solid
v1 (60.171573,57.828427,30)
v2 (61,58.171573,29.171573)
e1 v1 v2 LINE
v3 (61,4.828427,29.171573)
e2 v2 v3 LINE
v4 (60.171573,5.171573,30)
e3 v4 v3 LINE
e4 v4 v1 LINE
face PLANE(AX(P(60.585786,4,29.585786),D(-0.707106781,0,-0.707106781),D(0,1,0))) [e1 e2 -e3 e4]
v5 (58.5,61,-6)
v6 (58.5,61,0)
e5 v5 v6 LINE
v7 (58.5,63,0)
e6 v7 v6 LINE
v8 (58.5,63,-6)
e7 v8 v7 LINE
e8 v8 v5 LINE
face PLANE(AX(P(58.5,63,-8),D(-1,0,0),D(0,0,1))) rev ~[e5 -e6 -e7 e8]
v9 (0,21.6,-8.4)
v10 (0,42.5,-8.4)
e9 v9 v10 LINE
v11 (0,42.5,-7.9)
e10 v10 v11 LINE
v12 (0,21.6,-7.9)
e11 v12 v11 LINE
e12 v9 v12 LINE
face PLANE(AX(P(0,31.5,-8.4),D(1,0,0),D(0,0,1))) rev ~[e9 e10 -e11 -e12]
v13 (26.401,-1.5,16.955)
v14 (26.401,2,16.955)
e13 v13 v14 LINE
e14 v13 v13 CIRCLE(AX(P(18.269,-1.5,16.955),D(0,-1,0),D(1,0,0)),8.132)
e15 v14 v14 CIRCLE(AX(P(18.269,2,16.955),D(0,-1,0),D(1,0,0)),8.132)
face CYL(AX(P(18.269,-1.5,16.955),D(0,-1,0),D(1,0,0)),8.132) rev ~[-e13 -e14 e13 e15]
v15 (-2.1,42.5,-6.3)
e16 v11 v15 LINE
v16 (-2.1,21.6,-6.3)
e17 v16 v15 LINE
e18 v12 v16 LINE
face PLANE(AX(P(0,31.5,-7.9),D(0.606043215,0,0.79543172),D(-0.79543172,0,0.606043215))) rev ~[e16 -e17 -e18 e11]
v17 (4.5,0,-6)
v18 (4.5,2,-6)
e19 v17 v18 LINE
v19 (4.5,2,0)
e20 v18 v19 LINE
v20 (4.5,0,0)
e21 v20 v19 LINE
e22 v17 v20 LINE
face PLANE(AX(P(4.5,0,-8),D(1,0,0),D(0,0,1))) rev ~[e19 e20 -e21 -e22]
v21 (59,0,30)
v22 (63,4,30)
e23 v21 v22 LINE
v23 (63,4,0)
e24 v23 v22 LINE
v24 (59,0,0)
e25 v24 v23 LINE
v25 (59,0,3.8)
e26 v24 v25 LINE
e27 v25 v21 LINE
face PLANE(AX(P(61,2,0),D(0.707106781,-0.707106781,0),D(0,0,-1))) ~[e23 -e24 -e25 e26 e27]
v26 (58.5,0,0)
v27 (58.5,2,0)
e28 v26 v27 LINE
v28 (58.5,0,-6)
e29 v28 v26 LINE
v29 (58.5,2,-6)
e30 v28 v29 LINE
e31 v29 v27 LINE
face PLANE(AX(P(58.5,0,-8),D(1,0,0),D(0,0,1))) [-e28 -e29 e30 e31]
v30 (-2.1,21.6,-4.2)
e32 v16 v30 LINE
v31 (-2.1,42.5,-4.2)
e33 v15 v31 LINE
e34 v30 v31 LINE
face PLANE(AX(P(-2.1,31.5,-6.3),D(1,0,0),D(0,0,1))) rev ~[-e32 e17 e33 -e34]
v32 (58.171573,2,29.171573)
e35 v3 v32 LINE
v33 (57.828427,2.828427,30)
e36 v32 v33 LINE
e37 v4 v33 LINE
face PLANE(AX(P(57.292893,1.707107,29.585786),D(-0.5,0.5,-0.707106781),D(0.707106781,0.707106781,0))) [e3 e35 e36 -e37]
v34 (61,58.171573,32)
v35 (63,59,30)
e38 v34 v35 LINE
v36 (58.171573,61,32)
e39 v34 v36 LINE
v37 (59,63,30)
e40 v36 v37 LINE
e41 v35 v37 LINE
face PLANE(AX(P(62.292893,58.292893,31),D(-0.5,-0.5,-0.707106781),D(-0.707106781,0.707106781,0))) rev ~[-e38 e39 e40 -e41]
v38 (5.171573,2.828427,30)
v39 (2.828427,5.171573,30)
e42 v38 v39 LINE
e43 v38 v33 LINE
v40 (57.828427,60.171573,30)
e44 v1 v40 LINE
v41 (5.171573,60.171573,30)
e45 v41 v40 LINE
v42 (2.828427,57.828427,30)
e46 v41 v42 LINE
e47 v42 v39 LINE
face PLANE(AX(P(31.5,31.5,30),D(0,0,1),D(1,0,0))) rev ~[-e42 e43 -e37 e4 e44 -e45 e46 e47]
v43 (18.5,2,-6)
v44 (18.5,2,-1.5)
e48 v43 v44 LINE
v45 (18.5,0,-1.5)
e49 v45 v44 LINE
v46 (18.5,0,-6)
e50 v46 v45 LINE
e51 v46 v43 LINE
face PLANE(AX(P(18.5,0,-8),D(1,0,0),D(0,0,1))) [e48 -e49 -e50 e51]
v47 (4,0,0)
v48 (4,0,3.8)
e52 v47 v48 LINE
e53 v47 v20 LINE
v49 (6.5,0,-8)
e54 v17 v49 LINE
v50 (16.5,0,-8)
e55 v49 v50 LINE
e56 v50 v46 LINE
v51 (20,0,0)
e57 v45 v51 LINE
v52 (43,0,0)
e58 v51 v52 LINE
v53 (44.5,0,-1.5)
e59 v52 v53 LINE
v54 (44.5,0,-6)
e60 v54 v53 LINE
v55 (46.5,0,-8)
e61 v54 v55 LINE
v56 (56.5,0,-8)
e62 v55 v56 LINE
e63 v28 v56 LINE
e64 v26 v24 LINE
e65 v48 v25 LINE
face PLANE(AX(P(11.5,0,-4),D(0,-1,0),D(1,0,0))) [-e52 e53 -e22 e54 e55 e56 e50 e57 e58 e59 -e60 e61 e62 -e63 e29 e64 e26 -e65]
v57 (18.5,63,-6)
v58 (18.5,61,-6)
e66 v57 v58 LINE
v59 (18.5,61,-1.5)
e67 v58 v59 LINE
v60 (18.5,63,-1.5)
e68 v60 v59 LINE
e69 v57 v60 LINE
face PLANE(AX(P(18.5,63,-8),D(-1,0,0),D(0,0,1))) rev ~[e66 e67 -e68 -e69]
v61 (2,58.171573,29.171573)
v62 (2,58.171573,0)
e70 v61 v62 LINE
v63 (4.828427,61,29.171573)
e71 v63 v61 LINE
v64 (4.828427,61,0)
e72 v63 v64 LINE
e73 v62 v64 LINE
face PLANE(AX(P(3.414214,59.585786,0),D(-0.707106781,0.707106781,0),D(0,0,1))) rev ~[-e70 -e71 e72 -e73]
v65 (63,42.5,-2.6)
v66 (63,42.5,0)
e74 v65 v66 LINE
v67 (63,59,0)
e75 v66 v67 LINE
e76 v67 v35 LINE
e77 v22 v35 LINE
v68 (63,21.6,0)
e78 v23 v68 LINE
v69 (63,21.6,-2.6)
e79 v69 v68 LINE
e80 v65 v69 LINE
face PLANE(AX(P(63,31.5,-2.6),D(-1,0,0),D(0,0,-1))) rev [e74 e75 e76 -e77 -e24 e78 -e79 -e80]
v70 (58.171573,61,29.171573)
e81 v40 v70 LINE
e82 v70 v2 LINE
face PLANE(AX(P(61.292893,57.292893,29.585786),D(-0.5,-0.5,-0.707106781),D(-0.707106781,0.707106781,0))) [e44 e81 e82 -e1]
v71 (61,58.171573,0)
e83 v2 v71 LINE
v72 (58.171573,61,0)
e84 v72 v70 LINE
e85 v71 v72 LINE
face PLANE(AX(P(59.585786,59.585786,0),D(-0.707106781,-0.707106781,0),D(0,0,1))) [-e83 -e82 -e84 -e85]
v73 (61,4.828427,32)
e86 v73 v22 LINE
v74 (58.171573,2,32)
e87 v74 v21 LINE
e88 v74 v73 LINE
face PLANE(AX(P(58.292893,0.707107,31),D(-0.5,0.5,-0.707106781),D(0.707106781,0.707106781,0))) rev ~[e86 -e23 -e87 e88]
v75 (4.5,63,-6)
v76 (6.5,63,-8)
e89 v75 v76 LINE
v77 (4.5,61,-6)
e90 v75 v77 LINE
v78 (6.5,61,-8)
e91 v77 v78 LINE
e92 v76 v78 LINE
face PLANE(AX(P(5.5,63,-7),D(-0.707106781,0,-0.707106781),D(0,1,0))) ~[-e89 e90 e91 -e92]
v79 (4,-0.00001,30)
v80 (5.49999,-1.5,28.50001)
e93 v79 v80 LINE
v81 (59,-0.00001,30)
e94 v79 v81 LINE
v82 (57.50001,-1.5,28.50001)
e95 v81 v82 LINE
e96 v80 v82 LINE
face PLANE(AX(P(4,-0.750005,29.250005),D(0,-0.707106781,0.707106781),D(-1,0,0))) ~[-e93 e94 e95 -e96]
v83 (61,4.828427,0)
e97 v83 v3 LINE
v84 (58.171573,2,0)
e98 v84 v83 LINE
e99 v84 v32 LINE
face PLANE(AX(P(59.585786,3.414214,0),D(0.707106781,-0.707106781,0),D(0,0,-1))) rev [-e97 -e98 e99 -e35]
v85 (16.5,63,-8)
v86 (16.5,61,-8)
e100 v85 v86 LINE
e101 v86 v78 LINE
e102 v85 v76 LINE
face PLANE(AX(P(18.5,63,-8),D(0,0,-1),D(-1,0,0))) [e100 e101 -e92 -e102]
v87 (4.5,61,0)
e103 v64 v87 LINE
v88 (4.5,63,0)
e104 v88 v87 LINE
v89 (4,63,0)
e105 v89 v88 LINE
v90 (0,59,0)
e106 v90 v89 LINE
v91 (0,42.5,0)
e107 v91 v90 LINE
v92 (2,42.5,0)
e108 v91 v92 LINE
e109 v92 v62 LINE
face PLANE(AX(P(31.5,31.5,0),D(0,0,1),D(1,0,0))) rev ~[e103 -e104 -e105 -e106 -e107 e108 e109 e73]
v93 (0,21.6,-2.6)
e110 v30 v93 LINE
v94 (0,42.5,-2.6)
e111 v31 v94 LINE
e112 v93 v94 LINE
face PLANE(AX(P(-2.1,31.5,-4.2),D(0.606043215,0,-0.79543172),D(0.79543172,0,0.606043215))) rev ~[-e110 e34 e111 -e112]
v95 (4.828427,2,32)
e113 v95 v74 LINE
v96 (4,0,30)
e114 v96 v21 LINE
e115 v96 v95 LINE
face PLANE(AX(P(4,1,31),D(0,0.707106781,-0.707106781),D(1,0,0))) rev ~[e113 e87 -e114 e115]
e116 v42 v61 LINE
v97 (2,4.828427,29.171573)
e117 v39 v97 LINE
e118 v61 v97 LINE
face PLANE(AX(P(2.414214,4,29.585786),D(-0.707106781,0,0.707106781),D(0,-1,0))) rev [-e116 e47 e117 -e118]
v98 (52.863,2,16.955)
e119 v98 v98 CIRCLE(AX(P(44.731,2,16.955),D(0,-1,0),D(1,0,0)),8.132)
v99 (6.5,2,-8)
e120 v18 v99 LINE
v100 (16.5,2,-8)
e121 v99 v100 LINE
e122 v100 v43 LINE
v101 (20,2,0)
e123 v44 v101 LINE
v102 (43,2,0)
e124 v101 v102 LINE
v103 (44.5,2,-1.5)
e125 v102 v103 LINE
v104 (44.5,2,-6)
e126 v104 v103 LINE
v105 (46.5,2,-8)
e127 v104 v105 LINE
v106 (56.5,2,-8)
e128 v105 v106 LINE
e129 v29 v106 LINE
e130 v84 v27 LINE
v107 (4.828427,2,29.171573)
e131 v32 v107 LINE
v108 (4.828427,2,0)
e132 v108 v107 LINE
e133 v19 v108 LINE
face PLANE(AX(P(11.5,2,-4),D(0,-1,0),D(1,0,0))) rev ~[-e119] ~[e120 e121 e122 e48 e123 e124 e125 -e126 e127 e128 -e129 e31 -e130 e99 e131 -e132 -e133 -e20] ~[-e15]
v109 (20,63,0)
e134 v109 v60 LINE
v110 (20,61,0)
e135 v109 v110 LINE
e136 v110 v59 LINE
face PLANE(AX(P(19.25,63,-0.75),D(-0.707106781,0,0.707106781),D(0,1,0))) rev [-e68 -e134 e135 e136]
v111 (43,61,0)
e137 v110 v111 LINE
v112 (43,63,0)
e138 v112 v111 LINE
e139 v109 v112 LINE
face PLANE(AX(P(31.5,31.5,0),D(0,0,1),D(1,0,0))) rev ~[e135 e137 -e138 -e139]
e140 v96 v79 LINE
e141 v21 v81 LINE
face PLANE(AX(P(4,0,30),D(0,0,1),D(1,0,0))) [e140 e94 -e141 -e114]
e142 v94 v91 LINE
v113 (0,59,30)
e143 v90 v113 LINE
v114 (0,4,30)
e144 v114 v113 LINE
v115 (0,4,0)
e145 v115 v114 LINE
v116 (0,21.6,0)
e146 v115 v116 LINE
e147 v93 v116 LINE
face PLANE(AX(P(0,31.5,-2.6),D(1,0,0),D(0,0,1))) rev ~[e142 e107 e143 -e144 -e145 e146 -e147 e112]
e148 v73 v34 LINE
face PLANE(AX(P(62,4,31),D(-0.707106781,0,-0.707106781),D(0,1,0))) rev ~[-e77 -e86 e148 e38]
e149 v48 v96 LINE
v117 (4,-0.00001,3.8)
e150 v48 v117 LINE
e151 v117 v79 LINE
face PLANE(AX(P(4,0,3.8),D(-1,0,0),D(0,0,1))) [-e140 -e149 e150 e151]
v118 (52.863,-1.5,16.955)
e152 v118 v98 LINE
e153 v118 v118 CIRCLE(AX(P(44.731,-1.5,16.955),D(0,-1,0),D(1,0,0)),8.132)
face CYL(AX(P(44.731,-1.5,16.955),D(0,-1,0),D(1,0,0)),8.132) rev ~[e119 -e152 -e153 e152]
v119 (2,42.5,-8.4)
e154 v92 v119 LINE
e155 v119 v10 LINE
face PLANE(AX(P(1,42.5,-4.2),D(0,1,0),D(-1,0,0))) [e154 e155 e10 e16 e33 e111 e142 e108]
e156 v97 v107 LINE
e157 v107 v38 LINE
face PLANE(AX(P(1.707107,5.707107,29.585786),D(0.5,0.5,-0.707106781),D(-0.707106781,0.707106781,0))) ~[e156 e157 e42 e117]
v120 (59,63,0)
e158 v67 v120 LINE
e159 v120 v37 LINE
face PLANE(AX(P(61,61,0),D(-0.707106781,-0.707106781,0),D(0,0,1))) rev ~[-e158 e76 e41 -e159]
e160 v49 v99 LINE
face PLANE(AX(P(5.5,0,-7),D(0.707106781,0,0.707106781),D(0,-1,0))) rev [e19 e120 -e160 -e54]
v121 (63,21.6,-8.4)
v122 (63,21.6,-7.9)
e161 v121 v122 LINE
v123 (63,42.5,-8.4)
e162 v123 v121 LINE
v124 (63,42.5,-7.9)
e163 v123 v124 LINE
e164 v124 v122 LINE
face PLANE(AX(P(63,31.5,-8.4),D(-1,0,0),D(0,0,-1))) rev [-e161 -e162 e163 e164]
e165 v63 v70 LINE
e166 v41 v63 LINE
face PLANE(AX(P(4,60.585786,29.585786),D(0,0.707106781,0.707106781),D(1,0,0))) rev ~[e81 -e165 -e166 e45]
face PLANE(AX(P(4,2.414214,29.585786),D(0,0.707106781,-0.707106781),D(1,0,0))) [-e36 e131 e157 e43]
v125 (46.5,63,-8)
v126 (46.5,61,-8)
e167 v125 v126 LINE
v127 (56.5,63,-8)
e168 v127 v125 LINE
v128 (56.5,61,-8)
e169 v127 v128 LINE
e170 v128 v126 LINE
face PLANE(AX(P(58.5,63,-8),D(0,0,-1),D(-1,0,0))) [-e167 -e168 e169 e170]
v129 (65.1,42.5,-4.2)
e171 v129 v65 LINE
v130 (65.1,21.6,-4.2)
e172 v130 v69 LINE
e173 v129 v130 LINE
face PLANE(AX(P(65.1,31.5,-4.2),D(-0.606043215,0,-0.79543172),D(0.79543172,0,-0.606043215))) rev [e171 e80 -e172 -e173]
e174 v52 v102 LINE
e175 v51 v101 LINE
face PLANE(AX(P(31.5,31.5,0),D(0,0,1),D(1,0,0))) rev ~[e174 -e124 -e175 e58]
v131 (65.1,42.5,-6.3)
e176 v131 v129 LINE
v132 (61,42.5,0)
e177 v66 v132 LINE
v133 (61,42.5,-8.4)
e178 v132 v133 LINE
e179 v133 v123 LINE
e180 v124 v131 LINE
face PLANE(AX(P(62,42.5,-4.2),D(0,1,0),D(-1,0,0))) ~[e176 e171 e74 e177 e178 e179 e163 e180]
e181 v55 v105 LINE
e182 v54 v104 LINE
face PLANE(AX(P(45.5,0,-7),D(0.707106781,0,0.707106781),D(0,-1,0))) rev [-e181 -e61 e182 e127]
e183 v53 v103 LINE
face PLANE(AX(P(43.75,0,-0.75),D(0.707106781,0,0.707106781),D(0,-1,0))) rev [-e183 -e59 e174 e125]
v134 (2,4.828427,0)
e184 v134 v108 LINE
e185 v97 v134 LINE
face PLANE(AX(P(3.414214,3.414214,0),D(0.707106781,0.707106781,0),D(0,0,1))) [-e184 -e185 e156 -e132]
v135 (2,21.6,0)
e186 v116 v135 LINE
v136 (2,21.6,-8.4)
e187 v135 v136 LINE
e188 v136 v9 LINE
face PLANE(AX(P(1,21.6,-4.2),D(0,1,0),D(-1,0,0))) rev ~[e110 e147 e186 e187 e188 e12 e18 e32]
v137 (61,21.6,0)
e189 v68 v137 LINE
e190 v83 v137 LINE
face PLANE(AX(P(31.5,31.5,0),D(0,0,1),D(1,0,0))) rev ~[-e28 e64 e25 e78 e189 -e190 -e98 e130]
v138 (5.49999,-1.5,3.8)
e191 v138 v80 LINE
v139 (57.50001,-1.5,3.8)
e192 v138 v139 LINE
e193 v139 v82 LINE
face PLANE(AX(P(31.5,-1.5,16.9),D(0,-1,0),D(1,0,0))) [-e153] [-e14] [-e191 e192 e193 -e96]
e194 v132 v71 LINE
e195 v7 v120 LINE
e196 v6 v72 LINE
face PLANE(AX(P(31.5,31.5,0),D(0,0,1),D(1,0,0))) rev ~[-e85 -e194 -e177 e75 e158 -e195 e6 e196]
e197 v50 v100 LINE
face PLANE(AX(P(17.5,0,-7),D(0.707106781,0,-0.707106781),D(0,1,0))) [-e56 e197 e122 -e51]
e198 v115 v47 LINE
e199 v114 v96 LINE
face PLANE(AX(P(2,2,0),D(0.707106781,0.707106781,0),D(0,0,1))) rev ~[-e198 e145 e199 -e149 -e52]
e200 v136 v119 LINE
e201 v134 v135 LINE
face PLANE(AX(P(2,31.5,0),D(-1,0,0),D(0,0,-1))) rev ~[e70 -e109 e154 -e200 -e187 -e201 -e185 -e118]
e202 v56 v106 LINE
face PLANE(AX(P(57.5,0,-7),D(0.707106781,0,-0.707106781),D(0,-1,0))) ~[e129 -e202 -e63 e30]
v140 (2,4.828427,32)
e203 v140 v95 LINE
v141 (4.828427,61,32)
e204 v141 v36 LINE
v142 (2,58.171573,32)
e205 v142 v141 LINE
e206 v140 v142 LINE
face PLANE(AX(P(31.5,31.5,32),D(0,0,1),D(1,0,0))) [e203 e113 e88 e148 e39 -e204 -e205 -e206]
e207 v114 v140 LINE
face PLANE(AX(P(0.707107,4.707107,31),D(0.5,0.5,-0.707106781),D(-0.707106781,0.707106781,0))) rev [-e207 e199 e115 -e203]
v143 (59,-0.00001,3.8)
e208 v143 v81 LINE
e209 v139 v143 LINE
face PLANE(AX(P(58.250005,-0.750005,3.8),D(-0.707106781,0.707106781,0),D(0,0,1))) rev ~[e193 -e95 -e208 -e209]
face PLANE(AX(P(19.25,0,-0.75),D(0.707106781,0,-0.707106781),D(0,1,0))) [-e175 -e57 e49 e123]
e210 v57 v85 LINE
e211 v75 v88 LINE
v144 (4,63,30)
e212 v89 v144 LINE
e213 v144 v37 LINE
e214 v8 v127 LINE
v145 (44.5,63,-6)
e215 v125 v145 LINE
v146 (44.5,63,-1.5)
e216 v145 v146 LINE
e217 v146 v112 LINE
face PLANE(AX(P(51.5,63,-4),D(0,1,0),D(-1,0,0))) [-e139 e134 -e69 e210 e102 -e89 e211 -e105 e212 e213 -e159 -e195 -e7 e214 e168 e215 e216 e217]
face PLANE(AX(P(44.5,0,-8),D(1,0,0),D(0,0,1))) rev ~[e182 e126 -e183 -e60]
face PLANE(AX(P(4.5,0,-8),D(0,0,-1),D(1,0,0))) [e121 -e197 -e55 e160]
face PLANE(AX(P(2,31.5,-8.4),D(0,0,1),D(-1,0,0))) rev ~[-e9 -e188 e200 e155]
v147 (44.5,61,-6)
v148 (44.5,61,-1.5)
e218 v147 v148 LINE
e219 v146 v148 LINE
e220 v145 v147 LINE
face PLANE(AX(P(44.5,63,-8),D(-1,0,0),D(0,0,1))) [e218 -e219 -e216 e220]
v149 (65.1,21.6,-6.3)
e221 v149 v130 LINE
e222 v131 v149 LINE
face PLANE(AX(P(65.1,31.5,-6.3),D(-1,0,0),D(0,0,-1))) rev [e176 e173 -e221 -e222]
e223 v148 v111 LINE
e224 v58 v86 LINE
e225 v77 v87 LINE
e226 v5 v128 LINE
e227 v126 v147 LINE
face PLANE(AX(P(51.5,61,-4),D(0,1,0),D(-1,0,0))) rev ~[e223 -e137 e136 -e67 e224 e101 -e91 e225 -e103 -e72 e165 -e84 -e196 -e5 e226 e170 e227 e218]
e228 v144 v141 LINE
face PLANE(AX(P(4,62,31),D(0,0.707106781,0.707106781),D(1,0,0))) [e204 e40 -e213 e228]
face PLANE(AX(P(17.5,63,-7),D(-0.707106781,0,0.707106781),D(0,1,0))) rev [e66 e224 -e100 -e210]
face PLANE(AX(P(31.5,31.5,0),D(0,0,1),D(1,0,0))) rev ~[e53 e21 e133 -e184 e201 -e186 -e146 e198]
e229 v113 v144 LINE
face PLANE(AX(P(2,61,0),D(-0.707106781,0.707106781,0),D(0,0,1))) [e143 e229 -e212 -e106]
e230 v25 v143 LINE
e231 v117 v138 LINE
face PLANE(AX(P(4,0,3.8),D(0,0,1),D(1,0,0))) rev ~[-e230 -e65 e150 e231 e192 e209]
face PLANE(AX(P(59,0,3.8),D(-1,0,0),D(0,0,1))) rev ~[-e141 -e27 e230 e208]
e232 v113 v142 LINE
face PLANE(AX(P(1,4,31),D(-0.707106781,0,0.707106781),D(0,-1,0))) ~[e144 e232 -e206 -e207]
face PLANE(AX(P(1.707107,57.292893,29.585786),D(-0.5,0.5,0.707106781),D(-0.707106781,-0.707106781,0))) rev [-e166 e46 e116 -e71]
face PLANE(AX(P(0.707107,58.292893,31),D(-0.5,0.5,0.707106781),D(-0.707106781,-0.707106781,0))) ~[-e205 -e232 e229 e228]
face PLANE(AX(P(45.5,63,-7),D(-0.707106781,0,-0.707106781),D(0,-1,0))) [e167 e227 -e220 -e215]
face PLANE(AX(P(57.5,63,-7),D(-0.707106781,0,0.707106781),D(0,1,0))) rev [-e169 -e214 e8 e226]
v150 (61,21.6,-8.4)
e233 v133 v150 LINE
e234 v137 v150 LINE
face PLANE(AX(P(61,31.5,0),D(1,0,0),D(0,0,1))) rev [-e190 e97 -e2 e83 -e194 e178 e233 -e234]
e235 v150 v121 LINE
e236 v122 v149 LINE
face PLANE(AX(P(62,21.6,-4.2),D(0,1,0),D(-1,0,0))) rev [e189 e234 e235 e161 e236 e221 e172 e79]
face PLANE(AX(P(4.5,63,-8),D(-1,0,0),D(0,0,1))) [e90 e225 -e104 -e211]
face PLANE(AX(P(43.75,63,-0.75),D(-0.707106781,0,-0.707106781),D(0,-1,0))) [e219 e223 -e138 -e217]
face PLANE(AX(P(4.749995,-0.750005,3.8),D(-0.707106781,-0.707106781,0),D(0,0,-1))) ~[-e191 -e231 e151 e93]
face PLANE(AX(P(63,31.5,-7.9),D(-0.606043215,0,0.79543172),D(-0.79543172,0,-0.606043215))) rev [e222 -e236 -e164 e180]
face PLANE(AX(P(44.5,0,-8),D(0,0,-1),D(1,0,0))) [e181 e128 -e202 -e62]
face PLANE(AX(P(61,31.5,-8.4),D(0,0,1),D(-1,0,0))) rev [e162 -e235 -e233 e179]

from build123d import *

# Parameters (mm, degrees)
F0_W      = 63
F0_H      = 63
F1_DEPTH  = 32
F2_SIZE   = 4
F3_SIZE   = 2
F4_T      = -2
F5_W      = 55
F5_H      = 26.2
F6_DEPTH  = 1.5
F7_SIZE   = 1.49999
F8_R      = 8.132
F9_DEPTH  = 3.5
F10_W     = 14
F10_H     = 8
F11_DEPTH = 2
F13_W     = 14
F13_H     = 8
F14_DEPTH = 2
F15_SIZE  = 2
F16_SIZE  = 1.5
F18_DEPTH = 9.9
F19_DEPTH = 11


# Not quite as in the source:
# - a fillet or chamfer is up to 0.001 mm smaller than in the source, because OpenCascade refuses the exact size
# - a pattern or mirror of a feature is missing from the dataset's text; its kind, count and spacing are read off the source's solid


with BuildPart() as f1:
    # F0 (on Top) → F1 (new body)
    with BuildSketch(Plane.XY):
        with Locations((31.5, 31.5)):
            Rectangle(F0_W, F0_H)
    extrude(amount=F1_DEPTH)

    # F2
    f2_edges = [f1.edges().sort_by_distance(p)[0] for p in [
        (63, 0, 16),
        (63, 63, 16),
        (0, 0, 16),
        (0, 63, 16),
    ]]
    chamfer(f2_edges, length=F2_SIZE)

    # F3
    f3_edges = [f1.edges().sort_by_distance(p)[0] for p in [
        (0, 31.5, 32),
        (2, 61, 32),
        (2, 2, 32),
        (31.5, 63, 32),
        (31.5, 0, 32),
        (61, 61, 32),
        (61, 2, 32),
        (63, 31.5, 32),
    ]]
    chamfer(f3_edges, length=F3_SIZE)

    # F4
    f4_openings = [f1.faces().sort_by_distance(p)[0] for p in [
        (31.5, 31.5, 0),
    ]]
    offset(amount=F4_T, openings=f4_openings)

    # F5 (on face) → F6 (join)
    with BuildSketch(Plane.XZ):
        with Locations((31.5, 16.9)):
            Rectangle(F5_W, F5_H)
    extrude(amount=F6_DEPTH)

    # F7 (size 1.5 in the source; OpenCascade refuses exactly that, so slightly less here)
    f7_edges = [f1.edges().sort_by_distance(p)[0] for p in [
        (31.5, -1.5, 30),
        (4, -1.5, 16.9),
        (59, -1.5, 16.9),
    ]]
    chamfer(f7_edges, length=F7_SIZE)

    # F8 (on face) → F9 (cut, through all)
    with BuildSketch(Plane.XZ.offset(1.5)):
        with Locations((18.269, 16.955)):
            Circle(F8_R)
        with Locations((44.731, 16.955)):
            Circle(F8_R)
    extrude(amount=-F9_DEPTH, mode=Mode.SUBTRACT)

    # F10 (on face) → F11 (join, through all)
    with BuildSketch(Plane.XZ):
        with Locations((11.5, -4)):
            Rectangle(F10_W, F10_H)
        with Locations((51.5, -4)):
            Rectangle(F10_W, F10_H)
    extrude(amount=-F11_DEPTH)

    # F13 (on face) → F14 (join)
    with BuildSketch(Plane(origin=(0, 63, 0), x_dir=(-1, 0, 0), z_dir=(0, 1, 0))):
        with Locations((-51.5, -4)):
            Rectangle(F13_W, F13_H)
        with Locations((-11.5, -4)):
            Rectangle(F13_W, F13_H)
    extrude(amount=-F14_DEPTH)

    # F15
    f15_edges = [f1.edges().sort_by_distance(p)[0] for p in [
        (4.5, 1, -8),
        (18.5, 1, -8),
        (44.5, 1, -8),
        (58.5, 1, -8),
        (18.5, 62, -8),
        (4.5, 62, -8),
        (58.5, 62, -8),
        (44.5, 62, -8),
    ]]
    chamfer(f15_edges, length=F15_SIZE)

    # F16
    f16_edges = [f1.edges().sort_by_distance(p)[0] for p in [
        (18.5, 62, 0),
        (18.5, 1, 0),
        (44.5, 1, 0),
        (44.5, 62, 0),
    ]]
    chamfer(f16_edges, length=F16_SIZE)

    # F17 (on mid) → F18 (join)
    with BuildSketch(Plane(origin=(0, 31.5, 0), x_dir=(-1, 0, 0), z_dir=(0, 1, 0))):
        Polygon((0, -2.6), (0, 0), (-2, 0), (-2, -8.4), (0, -8.4), (0, -7.9), align=None)
        Polygon((2.1, -4.2), (0, -2.6), (0, -7.9), (2.1, -6.3), align=None)
    f18 = extrude(amount=-F18_DEPTH)

    # F18_copies: F18 across plane
    add(f18.mirror(Plane(origin=(31.5, 0, 0), x_dir=(0, 0, 1), z_dir=(1, 0, 0))))

    # F19 (add): a face of the model
    f19_faces = [f1.faces().sort_by_distance(p)[0] for p in [
        (0.3995726496, 31.5, -4.5320512821),
    ]]
    f19 = extrude(f19_faces, amount=F19_DEPTH)

    # F19_copies: F19 across plane
    add(f19.mirror(Plane(origin=(31.5, 0, 0), x_dir=(0, 0, 1), z_dir=(1, 0, 0))))


solid = f1.part
